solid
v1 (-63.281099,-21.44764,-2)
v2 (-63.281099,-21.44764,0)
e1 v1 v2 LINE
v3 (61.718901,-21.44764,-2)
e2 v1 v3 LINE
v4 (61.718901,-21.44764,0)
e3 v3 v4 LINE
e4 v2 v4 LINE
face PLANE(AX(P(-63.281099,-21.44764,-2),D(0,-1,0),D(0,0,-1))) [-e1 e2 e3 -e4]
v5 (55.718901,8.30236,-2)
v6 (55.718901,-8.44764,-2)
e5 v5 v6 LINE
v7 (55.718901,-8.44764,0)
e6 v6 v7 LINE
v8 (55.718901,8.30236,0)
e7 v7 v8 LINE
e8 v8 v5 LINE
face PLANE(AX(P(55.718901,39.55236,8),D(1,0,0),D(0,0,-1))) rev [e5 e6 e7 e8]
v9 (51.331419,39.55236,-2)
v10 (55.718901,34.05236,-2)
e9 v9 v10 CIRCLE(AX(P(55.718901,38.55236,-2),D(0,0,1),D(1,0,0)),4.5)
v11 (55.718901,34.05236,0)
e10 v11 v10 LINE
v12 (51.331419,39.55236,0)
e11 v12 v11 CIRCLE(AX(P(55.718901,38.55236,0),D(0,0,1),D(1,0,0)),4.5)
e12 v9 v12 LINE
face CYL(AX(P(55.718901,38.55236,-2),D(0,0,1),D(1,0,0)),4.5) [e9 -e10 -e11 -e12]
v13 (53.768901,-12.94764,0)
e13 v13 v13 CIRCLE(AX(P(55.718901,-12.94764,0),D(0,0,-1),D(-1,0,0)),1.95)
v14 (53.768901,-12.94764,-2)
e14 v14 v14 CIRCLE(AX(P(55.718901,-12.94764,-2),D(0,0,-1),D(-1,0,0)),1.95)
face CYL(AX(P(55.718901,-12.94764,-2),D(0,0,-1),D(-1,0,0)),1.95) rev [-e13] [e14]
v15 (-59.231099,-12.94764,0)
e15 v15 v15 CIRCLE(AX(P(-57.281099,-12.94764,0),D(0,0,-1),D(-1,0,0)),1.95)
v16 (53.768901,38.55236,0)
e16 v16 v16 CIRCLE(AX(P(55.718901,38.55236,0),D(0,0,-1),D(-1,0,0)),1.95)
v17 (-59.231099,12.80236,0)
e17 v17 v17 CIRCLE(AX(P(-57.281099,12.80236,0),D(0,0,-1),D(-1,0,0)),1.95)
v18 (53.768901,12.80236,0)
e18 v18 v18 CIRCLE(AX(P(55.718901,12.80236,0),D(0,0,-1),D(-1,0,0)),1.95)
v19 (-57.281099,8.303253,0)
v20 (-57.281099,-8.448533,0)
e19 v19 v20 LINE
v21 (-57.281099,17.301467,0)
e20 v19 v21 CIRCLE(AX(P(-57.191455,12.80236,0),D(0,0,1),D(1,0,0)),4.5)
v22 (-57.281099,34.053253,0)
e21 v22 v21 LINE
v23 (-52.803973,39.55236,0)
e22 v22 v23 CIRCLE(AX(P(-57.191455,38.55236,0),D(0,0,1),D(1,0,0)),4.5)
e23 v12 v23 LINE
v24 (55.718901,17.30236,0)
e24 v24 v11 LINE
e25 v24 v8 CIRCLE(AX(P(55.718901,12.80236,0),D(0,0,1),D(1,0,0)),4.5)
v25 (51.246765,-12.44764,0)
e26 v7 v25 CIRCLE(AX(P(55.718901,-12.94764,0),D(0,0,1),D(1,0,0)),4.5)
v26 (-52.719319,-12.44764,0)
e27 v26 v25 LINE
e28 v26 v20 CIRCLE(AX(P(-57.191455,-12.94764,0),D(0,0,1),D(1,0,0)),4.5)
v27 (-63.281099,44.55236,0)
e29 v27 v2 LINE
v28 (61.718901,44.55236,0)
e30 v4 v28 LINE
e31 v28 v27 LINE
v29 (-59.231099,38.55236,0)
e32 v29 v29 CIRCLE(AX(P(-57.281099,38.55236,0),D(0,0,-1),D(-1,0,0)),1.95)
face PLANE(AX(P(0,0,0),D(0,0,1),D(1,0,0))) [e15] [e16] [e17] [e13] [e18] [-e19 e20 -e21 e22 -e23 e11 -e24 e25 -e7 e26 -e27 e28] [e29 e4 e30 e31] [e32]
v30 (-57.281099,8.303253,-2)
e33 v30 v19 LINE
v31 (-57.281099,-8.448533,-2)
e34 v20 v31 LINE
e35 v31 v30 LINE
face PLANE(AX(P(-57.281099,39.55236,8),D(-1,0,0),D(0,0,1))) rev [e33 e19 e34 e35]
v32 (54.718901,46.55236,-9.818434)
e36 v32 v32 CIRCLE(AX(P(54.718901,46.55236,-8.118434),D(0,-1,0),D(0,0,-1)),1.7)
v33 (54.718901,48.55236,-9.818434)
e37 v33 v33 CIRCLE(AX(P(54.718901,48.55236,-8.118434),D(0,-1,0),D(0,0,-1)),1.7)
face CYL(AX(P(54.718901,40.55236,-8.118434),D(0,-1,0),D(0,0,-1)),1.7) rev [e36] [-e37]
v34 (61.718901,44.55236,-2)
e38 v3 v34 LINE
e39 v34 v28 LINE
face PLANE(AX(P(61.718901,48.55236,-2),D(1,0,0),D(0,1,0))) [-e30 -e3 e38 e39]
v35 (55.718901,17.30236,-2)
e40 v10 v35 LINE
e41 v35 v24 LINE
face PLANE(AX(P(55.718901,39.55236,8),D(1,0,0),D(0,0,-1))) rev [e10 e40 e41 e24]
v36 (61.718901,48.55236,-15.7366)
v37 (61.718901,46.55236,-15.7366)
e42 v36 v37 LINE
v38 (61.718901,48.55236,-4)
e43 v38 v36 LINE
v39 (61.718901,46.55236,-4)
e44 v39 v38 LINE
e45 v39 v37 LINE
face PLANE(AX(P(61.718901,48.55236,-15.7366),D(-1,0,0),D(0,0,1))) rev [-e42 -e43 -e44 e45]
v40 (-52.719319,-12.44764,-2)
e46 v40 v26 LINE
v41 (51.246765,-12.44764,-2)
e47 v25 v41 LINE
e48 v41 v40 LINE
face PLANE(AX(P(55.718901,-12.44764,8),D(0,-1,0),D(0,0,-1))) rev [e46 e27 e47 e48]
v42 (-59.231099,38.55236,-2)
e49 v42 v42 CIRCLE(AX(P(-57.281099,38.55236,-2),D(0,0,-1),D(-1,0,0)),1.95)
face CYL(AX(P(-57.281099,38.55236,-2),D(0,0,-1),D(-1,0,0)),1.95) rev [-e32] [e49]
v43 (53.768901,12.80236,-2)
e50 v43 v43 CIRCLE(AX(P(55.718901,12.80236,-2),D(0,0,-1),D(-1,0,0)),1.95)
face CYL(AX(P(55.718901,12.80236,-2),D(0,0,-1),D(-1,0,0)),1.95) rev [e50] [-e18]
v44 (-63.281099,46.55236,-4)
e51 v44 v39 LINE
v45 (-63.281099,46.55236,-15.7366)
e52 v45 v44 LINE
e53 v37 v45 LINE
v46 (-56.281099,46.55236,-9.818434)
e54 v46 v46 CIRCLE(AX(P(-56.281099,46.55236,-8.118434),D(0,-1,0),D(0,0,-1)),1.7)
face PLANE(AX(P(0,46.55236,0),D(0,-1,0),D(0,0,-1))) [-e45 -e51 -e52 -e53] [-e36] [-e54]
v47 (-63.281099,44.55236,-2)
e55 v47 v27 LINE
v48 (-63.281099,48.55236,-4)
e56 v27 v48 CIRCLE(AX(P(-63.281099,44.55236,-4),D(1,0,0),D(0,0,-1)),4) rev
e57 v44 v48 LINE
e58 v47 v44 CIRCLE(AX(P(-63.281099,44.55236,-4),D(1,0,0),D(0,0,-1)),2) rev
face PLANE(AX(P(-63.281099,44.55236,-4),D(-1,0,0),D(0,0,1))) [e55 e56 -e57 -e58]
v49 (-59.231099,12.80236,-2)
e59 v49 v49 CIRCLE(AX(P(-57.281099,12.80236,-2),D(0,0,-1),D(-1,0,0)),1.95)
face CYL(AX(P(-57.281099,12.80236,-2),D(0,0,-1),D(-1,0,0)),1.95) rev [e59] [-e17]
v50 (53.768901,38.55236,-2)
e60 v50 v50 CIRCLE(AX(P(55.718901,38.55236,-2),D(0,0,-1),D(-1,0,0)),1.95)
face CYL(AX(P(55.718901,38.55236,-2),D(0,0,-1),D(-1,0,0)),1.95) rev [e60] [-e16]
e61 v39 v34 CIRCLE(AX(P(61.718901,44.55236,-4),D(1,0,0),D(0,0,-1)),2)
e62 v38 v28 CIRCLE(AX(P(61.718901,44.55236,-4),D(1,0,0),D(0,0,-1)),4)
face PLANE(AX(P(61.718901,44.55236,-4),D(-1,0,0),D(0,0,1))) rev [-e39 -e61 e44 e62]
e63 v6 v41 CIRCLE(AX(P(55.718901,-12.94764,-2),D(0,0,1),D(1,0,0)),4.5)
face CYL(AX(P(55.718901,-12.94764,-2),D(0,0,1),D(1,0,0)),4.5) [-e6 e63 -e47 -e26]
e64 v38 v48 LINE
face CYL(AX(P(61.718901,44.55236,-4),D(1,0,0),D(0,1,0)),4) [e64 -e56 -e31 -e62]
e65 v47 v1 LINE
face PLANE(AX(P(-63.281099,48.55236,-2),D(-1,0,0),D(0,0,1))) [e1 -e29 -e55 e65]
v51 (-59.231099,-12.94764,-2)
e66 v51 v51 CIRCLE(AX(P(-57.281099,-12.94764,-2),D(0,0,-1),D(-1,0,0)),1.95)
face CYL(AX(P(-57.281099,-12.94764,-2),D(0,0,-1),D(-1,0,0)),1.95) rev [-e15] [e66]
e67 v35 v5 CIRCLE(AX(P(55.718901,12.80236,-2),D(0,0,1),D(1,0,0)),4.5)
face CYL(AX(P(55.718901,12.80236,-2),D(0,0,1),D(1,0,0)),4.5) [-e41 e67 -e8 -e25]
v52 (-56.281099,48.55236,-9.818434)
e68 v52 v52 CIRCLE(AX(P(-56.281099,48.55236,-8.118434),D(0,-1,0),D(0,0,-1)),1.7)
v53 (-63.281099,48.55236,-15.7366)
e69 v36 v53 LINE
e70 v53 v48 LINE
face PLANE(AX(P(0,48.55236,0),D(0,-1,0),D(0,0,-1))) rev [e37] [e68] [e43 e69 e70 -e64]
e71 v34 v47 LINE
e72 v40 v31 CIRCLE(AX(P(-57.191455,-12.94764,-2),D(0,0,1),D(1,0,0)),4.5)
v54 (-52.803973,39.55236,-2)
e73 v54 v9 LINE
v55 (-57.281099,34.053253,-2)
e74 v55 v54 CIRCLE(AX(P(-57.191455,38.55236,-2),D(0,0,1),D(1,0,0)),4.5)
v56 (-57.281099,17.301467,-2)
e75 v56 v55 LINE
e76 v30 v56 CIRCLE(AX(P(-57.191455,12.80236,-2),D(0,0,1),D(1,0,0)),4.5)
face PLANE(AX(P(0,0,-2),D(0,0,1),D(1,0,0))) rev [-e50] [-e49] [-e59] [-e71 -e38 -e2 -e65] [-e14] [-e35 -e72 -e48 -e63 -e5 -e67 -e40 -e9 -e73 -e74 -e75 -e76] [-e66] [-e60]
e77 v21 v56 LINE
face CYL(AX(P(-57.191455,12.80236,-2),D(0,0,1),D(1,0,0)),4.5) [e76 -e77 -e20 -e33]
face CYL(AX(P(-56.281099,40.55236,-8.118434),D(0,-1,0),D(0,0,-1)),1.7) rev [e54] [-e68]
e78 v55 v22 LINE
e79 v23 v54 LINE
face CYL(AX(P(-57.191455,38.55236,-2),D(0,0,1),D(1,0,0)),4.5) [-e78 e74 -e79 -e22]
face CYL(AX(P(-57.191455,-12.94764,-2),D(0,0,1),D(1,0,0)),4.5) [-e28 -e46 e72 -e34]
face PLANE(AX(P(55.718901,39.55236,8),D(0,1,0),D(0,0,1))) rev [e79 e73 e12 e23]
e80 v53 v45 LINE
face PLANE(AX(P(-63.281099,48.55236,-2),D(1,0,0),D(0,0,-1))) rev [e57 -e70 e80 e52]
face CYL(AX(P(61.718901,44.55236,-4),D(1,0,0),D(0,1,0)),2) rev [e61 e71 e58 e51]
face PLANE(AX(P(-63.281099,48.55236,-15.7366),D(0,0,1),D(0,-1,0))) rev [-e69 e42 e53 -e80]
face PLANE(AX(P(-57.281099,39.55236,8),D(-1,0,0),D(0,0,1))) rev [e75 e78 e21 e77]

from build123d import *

# Parameters (mm, degrees)
SKETCH3_W                    = 125
SKETCH3_H                    = 70
BASE_FLANGE1_DEPTH           = 2
EDGE_FLANGE2_STRIP_W         = 12
EDGE_FLANGE2_STRIP_H         = 2
EDGE_FLANGE2_STRIP_CUT_DEPTH = 125
EDGE_FLANGE2_DEPTH           = 125
SKETCH18_W                   = 113
SKETCH18_H                   = 52
CUT_EXTRUDE3_DEPTH           = 10
SKETCH23_R                   = 4.5
BOSS_EXTRUDE1_DEPTH          = 2
PSU_BRACKET_MB_HOLES_D       = 3.4
M3_5_CLEARANCE_HOLE1_D       = 3.9


# Sheet-metal steps are written as plain solids
with BuildPart() as part:
    # Sketch3 → Base-Flange1 (new body)
    with BuildSketch(Plane.XY):
        with Locations((-0.781098762, 13.552360409)):
            Rectangle(SKETCH3_W, SKETCH3_H)
    extrude(amount=-BASE_FLANGE1_DEPTH)

    # Edge-Flange2 strip (across the edge) → Edge-Flange2 strip cut (cut)
    with BuildSketch(Plane(origin=(-63.281098762, 48.552360409, -2), x_dir=(0, -1, 0), z_dir=(1, 0, 0))):
        with Locations((-2, -1)):
            Rectangle(EDGE_FLANGE2_STRIP_W, EDGE_FLANGE2_STRIP_H)
    extrude(amount=EDGE_FLANGE2_STRIP_CUT_DEPTH, mode=Mode.SUBTRACT)

    # Edge-Flange2 section (across the edge) → Edge-Flange2 (add)
    with BuildSketch(Plane(origin=(-63.281098762, 48.552360409, -2), x_dir=(0, -1, 0), z_dir=(1, 0, 0))):
        with BuildLine():
            Line((0, 2), (0, 13.7366))
            Line((0, 13.7366), (2, 13.7366))
            Line((2, 13.7366), (2, 2))
            ThreePointArc((2, 2), (2.585786438, 0.585786438), (4, 0))
            Line((4, 0), (4, -2))
            ThreePointArc((4, -2), (1.171572875, -0.828427125), (0, 2))
        make_face()
    extrude(amount=EDGE_FLANGE2_DEPTH)

    # Sketch18 → Cut-Extrude3 (cut)
    with BuildSketch(Plane(origin=(-99.752621101, 247.510324645, -2), x_dir=(1, 0, 0), z_dir=(0, 0, -1))):
        with Locations((98.971522339, 233.957964235)):
            Rectangle(SKETCH18_W, SKETCH18_H)
    extrude(amount=-CUT_EXTRUDE3_DEPTH, mode=Mode.SUBTRACT)

    # Sketch23 → Boss-Extrude1 (add)
    with BuildSketch(Plane.XY):
        with Locations((-57.191455267, 12.802360409)):
            Circle(SKETCH23_R)
        with Locations((-57.191455267, -12.947639591)):
            Circle(SKETCH23_R)
        with Locations((55.718901238, -12.947639591)):
            Circle(SKETCH23_R)
        with Locations((55.718901238, 12.802360409)):
            Circle(SKETCH23_R)
        with Locations((-57.191455267, 38.552360409)):
            Circle(SKETCH23_R)
        with Locations((55.718901238, 38.552360409)):
            Circle(SKETCH23_R)
    extrude(amount=-BOSS_EXTRUDE1_DEPTH)

    # PSU bracket MB holes (through all)
    with Locations(Plane(origin=(-99.752621101, 40.552360409, 598.492474399), x_dir=(1, 0, 0), z_dir=(0, -1, 0))):
        with Locations((43.471522339, -606.610908499), (154.471522339, -606.610908499)):
            Hole(PSU_BRACKET_MB_HOLES_D / 2)

    # M3.5 Clearance Hole1 (through all)
    with Locations(Plane(origin=(-98.752621101, 247.510324645, -2), x_dir=(1, 0, 0), z_dir=(0, 0, -1))):
        with Locations((41.471522339, 260.457964235), (41.471522339, 234.707964235), (41.471522339, 208.957964235), (154.471522339, 208.957964235), (154.471522339, 234.707964235), (154.471522339, 260.457964235)):
            Hole(M3_5_CLEARANCE_HOLE1_D / 2)


solid = part.part
